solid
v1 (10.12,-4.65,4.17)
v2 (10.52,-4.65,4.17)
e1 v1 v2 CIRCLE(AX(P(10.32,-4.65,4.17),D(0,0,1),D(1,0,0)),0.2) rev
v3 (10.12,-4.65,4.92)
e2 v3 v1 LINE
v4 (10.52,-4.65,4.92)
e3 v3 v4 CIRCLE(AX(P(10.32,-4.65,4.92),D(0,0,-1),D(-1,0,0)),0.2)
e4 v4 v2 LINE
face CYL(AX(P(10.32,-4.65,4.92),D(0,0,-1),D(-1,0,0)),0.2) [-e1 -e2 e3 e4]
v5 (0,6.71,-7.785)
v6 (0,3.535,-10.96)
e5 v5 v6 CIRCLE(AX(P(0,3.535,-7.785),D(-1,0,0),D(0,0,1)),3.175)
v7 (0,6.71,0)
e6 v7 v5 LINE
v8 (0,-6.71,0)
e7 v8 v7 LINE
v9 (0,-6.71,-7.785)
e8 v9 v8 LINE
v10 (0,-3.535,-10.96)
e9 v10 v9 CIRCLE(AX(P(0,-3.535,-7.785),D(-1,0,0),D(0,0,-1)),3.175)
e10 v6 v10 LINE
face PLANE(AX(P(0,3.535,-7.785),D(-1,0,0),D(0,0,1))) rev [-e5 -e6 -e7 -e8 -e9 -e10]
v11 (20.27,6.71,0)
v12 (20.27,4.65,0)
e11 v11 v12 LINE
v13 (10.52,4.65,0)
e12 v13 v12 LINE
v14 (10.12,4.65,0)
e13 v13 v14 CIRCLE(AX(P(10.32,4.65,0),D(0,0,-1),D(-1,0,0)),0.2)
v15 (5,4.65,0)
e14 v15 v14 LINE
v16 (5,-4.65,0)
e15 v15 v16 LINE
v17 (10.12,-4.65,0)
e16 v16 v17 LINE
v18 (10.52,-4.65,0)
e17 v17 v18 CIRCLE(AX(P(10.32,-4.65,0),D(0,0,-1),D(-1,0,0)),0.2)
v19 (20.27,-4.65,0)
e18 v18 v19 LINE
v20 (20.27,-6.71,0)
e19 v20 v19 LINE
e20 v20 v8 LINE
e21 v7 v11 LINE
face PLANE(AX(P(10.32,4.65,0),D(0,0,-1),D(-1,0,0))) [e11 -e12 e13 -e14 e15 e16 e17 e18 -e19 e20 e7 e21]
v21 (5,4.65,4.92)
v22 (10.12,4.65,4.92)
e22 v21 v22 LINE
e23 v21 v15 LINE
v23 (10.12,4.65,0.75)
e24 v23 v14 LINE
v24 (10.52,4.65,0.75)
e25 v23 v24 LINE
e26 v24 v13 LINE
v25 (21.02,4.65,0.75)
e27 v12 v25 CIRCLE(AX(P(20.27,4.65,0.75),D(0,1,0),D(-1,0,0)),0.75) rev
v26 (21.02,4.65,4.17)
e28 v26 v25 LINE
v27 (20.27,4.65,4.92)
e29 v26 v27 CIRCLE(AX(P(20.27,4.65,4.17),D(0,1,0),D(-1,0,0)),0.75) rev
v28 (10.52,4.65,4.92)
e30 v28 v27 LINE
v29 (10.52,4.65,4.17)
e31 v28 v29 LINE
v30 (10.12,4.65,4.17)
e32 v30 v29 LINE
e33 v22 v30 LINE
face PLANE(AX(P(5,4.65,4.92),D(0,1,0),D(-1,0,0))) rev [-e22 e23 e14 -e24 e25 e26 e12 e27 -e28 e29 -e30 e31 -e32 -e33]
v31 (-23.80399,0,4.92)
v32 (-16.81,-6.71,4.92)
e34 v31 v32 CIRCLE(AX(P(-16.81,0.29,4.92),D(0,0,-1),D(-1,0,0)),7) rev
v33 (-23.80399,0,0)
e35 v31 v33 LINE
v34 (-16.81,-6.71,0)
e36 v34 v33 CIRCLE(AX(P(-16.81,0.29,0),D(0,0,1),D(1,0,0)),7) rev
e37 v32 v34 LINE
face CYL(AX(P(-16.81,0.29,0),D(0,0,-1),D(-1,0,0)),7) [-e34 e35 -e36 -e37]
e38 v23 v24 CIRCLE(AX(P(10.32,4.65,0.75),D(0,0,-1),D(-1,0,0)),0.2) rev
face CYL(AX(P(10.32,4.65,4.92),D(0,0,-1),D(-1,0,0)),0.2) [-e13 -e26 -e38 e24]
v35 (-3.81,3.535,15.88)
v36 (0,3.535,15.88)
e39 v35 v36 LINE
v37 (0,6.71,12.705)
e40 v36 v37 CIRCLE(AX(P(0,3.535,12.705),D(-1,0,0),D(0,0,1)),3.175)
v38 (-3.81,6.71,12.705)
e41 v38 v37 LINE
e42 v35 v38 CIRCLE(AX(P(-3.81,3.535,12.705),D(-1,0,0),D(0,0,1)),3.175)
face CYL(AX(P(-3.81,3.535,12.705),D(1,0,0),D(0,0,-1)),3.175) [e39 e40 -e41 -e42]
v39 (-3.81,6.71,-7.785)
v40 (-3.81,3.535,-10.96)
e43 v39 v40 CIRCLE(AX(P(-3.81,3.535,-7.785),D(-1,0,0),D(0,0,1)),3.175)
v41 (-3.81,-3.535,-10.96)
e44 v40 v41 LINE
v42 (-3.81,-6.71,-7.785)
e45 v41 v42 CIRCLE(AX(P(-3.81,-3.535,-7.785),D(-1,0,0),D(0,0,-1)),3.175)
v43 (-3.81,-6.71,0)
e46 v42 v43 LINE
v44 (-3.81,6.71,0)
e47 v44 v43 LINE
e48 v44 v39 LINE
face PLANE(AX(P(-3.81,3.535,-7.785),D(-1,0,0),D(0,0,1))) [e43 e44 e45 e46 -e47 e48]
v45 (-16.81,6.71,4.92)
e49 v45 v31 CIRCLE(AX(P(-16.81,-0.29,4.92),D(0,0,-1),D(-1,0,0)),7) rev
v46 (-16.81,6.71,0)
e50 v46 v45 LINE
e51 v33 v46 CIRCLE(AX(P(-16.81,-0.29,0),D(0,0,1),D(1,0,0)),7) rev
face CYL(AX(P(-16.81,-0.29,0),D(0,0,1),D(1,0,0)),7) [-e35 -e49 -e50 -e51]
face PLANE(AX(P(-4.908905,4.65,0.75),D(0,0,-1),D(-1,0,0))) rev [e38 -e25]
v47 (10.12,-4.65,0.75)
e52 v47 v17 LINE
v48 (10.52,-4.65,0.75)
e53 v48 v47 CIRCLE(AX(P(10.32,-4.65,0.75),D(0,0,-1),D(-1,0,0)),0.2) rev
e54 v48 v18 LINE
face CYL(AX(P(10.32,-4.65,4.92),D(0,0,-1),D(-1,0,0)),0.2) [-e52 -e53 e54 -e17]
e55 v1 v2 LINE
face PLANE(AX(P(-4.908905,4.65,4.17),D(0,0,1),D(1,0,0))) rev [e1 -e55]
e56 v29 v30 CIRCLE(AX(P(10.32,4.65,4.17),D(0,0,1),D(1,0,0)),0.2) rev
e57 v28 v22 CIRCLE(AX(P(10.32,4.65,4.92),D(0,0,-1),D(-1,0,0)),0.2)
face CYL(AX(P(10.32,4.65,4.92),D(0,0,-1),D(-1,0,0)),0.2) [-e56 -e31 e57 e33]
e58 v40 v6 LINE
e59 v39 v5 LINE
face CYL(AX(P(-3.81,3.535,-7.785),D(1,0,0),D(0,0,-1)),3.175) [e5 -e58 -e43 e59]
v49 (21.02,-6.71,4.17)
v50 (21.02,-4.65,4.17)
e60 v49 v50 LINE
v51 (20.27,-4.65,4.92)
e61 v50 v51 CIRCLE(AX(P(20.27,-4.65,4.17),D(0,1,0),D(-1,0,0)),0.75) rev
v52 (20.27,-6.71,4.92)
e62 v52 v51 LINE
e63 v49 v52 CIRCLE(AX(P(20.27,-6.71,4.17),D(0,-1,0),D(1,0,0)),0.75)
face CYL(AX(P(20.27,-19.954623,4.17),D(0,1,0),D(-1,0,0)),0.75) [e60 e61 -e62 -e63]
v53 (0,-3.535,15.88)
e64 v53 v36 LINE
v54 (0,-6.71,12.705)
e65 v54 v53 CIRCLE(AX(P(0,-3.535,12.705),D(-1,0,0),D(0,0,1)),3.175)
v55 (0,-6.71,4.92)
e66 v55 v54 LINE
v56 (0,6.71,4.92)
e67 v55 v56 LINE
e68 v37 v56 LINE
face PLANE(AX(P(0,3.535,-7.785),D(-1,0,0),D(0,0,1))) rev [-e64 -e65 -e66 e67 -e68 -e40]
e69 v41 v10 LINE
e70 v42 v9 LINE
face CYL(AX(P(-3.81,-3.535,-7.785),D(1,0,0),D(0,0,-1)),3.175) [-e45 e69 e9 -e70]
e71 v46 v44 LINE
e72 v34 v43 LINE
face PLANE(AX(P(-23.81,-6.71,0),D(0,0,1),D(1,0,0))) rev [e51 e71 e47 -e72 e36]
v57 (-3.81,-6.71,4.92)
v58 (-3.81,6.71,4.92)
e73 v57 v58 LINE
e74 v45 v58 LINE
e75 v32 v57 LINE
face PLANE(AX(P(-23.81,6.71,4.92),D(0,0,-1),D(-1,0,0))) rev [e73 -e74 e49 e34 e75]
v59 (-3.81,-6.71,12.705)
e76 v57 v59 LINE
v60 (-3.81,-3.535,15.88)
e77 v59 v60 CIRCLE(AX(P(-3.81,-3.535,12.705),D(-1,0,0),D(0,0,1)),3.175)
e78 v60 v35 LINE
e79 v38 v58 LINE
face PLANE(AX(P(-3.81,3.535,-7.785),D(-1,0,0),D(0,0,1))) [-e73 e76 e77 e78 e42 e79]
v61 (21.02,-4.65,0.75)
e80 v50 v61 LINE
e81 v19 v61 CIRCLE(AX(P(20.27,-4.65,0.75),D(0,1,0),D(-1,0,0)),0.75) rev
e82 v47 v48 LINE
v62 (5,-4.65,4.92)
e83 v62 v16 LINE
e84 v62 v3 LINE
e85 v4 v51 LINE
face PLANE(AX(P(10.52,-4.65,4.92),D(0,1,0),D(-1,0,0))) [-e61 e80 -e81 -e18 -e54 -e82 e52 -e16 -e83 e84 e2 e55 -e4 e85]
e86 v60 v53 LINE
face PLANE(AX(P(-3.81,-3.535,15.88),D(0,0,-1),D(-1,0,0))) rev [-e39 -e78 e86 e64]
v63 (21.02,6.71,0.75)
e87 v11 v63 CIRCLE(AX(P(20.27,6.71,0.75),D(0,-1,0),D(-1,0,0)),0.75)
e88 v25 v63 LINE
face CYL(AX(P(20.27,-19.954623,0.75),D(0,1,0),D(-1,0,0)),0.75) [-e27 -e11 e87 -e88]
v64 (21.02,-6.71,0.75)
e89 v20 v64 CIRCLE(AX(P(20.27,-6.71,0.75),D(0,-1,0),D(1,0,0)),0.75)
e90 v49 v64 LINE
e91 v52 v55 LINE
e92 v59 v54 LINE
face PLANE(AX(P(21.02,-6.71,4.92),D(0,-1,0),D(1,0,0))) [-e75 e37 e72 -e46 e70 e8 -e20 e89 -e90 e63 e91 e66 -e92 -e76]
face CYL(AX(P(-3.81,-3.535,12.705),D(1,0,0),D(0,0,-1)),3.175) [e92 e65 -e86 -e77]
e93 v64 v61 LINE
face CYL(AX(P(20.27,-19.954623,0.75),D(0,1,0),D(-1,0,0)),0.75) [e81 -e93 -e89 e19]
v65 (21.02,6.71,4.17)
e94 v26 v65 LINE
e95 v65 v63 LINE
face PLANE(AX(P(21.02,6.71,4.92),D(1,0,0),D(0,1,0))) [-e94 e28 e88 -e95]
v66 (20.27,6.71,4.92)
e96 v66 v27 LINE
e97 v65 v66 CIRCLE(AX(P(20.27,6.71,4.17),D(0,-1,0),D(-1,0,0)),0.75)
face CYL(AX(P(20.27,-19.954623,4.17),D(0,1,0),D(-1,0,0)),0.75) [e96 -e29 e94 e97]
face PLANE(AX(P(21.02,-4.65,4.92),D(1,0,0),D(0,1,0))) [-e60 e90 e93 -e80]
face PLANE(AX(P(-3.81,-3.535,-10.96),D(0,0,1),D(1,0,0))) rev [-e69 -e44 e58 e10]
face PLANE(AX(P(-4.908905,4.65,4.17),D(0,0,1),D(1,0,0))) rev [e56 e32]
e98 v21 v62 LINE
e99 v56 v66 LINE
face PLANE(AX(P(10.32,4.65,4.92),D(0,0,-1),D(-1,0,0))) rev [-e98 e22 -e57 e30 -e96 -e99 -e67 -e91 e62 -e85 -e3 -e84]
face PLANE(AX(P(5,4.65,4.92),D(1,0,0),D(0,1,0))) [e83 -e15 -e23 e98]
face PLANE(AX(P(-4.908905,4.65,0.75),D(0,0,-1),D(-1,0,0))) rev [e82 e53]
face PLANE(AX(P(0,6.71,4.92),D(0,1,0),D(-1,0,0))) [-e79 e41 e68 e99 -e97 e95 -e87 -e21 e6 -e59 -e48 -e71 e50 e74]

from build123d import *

# Parameters (mm, degrees)
BOSS_EXTRUDE1_DEPTH = 4.92
CUT_EXTRUDE1_REACH  = 27.419
CUT_EXTRUDE2_REACH  = 24.607
SKETCH3_W           = 3.42
SKETCH3_H           = 9.3
BOSS_EXTRUDE2_DEPTH = 3.81
SKETCH5_W           = 4.92
SKETCH5_H           = 13.42
BOSS_EXTRUDE3_DEPTH = 20
FILLET1_R           = 7


with BuildPart() as part:
    # Sketch1 → Boss-Extrude1 (new body)
    with BuildSketch(Plane.XY):
        with BuildLine():
            Line((0, -6.71), (0, 6.71))
            Line((0, 6.71), (21.02, 6.71))
            Line((21.02, 6.71), (21.02, 4.65))
            Line((21.02, 4.65), (10.52, 4.65))
            ThreePointArc((10.52, 4.65), (10.32, 4.45), (10.12, 4.65))
            Line((10.12, 4.65), (5, 4.65))
            Line((5, 4.65), (5, -4.65))
            Line((5, -4.65), (10.12, -4.65))
            ThreePointArc((10.12, -4.65), (10.32, -4.45), (10.52, -4.65))
            Line((10.52, -4.65), (21.02, -4.65))
            Line((21.02, -4.65), (21.02, -6.71))
            Line((21.02, -6.71), (0, -6.71))
        make_face()
    extrude(amount=BOSS_EXTRUDE1_DEPTH)

    # Cut-Extrude1: up to this face of the body (flat: up to its plane)
    cut_extrude1_end = Plane(part.part.faces().sort_by_distance((10.51, -6.71, 2.46))[0])
    # Sketch2 → Cut-Extrude1 (cut, up to the picked face)
    with BuildSketch(Plane(origin=(0, 6.71, 0), x_dir=(1, 0, 0), z_dir=(0, 1, 0)), mode=Mode.PRIVATE) as cut_extrude1_sk1:
        with BuildLine():
            Line((18.617685134, -4.92), (20.27, -4.92))
            ThreePointArc((20.27, -4.92), (20.800330086, -4.700330086), (21.02, -4.17))
            Line((21.02, -4.17), (21.02, -0.75))
            ThreePointArc((21.02, -0.75), (20.800330086, -0.219669914), (20.27, 0))
            Line((20.27, 0), (18.617685134, 0))
            Line((18.617685134, 0), (18.617685134, 2.663079407))
            Line((18.617685134, 2.663079407), (23.784387399, 2.663079407))
            Line((23.784387399, 2.663079407), (23.784387399, -9.532215778))
            Line((23.784387399, -9.532215778), (18.617685134, -9.532215778))
            Line((18.617685134, -9.532215778), (18.617685134, -4.92))
        make_face()
    cut_extrude1_tool1 = split(extrude(cut_extrude1_sk1.sketch, amount=-CUT_EXTRUDE1_REACH, mode=Mode.PRIVATE), bisect_by=cut_extrude1_end, keep=Keep.BOTH, mode=Mode.PRIVATE)
    add(cut_extrude1_tool1.solids().sort_by(Axis((21.51704, 6.71, 3.653957), (0, -1, 0)))[0], mode=Mode.SUBTRACT)

    # Cut-Extrude2: up to this face of the body (flat: up to its plane)
    cut_extrude2_end = Plane(part.part.faces().sort_by_distance((5, 0, 2.46))[0])
    # Sketch3 → Cut-Extrude2 (cut, up to the picked face)
    with BuildSketch(Plane(origin=(21.02, 0, 0), x_dir=(0, 0, -1), z_dir=(1, 0, 0)), mode=Mode.PRIVATE) as cut_extrude2_sk1:
        with Locations((-2.46, 0)):
            Rectangle(SKETCH3_W, SKETCH3_H)
    cut_extrude2_tool1 = split(extrude(cut_extrude2_sk1.sketch, amount=-CUT_EXTRUDE2_REACH, mode=Mode.PRIVATE), bisect_by=cut_extrude2_end, keep=Keep.BOTH, mode=Mode.PRIVATE)
    add(cut_extrude2_tool1.solids().sort_by(Axis((21.02, 0, 2.46), (-1, 0, 0)))[0], mode=Mode.SUBTRACT)

    # Sketch4 → Boss-Extrude2 (add)
    with BuildSketch(Plane.ZY):
        with BuildLine():
            Line((12.705, -6.71), (-7.785, -6.71))
            ThreePointArc((-7.785, -6.71), (-10.03006403, -5.78006403), (-10.96, -3.535))
            Line((-10.96, -3.535), (-10.96, 3.535))
            ThreePointArc((-10.96, 3.535), (-10.03006403, 5.78006403), (-7.785, 6.71))
            Line((-7.785, 6.71), (12.705, 6.71))
            ThreePointArc((12.705, 6.71), (14.95006403, 5.78006403), (15.88, 3.535))
            Line((15.88, 3.535), (15.88, -3.535))
            ThreePointArc((15.88, -3.535), (14.95006403, -5.78006403), (12.705, -6.71))
        make_face()
    extrude(amount=BOSS_EXTRUDE2_DEPTH)

    # Sketch5 → Boss-Extrude3 (add)
    with BuildSketch(Plane.ZY.offset(3.81)):
        with Locations((2.46, 0)):
            Rectangle(SKETCH5_W, SKETCH5_H)
    extrude(amount=BOSS_EXTRUDE3_DEPTH)

    # Fillet1
    # the kernel refuses this fillet: 7 mm, written as the material it takes off along each edge
    with BuildSketch(Plane(origin=(-23.81, -6.71, 22.42), x_dir=(1, 0, 0), z_dir=(0, 0, -1)), Plane(origin=(-23.81, 6.71, -17.5), x_dir=(1, 0, 0), z_dir=(0, 0, 1))) as fillet1_piece_1:
        with BuildLine():
            CenterArc((FILLET1_R, -FILLET1_R), FILLET1_R, 90, 90)
            Line((0, -FILLET1_R), (0, 0))
            Line((0, 0), (FILLET1_R, 0))
        make_face()
    extrude(amount=39.92, mode=Mode.SUBTRACT)


solid = part.part
